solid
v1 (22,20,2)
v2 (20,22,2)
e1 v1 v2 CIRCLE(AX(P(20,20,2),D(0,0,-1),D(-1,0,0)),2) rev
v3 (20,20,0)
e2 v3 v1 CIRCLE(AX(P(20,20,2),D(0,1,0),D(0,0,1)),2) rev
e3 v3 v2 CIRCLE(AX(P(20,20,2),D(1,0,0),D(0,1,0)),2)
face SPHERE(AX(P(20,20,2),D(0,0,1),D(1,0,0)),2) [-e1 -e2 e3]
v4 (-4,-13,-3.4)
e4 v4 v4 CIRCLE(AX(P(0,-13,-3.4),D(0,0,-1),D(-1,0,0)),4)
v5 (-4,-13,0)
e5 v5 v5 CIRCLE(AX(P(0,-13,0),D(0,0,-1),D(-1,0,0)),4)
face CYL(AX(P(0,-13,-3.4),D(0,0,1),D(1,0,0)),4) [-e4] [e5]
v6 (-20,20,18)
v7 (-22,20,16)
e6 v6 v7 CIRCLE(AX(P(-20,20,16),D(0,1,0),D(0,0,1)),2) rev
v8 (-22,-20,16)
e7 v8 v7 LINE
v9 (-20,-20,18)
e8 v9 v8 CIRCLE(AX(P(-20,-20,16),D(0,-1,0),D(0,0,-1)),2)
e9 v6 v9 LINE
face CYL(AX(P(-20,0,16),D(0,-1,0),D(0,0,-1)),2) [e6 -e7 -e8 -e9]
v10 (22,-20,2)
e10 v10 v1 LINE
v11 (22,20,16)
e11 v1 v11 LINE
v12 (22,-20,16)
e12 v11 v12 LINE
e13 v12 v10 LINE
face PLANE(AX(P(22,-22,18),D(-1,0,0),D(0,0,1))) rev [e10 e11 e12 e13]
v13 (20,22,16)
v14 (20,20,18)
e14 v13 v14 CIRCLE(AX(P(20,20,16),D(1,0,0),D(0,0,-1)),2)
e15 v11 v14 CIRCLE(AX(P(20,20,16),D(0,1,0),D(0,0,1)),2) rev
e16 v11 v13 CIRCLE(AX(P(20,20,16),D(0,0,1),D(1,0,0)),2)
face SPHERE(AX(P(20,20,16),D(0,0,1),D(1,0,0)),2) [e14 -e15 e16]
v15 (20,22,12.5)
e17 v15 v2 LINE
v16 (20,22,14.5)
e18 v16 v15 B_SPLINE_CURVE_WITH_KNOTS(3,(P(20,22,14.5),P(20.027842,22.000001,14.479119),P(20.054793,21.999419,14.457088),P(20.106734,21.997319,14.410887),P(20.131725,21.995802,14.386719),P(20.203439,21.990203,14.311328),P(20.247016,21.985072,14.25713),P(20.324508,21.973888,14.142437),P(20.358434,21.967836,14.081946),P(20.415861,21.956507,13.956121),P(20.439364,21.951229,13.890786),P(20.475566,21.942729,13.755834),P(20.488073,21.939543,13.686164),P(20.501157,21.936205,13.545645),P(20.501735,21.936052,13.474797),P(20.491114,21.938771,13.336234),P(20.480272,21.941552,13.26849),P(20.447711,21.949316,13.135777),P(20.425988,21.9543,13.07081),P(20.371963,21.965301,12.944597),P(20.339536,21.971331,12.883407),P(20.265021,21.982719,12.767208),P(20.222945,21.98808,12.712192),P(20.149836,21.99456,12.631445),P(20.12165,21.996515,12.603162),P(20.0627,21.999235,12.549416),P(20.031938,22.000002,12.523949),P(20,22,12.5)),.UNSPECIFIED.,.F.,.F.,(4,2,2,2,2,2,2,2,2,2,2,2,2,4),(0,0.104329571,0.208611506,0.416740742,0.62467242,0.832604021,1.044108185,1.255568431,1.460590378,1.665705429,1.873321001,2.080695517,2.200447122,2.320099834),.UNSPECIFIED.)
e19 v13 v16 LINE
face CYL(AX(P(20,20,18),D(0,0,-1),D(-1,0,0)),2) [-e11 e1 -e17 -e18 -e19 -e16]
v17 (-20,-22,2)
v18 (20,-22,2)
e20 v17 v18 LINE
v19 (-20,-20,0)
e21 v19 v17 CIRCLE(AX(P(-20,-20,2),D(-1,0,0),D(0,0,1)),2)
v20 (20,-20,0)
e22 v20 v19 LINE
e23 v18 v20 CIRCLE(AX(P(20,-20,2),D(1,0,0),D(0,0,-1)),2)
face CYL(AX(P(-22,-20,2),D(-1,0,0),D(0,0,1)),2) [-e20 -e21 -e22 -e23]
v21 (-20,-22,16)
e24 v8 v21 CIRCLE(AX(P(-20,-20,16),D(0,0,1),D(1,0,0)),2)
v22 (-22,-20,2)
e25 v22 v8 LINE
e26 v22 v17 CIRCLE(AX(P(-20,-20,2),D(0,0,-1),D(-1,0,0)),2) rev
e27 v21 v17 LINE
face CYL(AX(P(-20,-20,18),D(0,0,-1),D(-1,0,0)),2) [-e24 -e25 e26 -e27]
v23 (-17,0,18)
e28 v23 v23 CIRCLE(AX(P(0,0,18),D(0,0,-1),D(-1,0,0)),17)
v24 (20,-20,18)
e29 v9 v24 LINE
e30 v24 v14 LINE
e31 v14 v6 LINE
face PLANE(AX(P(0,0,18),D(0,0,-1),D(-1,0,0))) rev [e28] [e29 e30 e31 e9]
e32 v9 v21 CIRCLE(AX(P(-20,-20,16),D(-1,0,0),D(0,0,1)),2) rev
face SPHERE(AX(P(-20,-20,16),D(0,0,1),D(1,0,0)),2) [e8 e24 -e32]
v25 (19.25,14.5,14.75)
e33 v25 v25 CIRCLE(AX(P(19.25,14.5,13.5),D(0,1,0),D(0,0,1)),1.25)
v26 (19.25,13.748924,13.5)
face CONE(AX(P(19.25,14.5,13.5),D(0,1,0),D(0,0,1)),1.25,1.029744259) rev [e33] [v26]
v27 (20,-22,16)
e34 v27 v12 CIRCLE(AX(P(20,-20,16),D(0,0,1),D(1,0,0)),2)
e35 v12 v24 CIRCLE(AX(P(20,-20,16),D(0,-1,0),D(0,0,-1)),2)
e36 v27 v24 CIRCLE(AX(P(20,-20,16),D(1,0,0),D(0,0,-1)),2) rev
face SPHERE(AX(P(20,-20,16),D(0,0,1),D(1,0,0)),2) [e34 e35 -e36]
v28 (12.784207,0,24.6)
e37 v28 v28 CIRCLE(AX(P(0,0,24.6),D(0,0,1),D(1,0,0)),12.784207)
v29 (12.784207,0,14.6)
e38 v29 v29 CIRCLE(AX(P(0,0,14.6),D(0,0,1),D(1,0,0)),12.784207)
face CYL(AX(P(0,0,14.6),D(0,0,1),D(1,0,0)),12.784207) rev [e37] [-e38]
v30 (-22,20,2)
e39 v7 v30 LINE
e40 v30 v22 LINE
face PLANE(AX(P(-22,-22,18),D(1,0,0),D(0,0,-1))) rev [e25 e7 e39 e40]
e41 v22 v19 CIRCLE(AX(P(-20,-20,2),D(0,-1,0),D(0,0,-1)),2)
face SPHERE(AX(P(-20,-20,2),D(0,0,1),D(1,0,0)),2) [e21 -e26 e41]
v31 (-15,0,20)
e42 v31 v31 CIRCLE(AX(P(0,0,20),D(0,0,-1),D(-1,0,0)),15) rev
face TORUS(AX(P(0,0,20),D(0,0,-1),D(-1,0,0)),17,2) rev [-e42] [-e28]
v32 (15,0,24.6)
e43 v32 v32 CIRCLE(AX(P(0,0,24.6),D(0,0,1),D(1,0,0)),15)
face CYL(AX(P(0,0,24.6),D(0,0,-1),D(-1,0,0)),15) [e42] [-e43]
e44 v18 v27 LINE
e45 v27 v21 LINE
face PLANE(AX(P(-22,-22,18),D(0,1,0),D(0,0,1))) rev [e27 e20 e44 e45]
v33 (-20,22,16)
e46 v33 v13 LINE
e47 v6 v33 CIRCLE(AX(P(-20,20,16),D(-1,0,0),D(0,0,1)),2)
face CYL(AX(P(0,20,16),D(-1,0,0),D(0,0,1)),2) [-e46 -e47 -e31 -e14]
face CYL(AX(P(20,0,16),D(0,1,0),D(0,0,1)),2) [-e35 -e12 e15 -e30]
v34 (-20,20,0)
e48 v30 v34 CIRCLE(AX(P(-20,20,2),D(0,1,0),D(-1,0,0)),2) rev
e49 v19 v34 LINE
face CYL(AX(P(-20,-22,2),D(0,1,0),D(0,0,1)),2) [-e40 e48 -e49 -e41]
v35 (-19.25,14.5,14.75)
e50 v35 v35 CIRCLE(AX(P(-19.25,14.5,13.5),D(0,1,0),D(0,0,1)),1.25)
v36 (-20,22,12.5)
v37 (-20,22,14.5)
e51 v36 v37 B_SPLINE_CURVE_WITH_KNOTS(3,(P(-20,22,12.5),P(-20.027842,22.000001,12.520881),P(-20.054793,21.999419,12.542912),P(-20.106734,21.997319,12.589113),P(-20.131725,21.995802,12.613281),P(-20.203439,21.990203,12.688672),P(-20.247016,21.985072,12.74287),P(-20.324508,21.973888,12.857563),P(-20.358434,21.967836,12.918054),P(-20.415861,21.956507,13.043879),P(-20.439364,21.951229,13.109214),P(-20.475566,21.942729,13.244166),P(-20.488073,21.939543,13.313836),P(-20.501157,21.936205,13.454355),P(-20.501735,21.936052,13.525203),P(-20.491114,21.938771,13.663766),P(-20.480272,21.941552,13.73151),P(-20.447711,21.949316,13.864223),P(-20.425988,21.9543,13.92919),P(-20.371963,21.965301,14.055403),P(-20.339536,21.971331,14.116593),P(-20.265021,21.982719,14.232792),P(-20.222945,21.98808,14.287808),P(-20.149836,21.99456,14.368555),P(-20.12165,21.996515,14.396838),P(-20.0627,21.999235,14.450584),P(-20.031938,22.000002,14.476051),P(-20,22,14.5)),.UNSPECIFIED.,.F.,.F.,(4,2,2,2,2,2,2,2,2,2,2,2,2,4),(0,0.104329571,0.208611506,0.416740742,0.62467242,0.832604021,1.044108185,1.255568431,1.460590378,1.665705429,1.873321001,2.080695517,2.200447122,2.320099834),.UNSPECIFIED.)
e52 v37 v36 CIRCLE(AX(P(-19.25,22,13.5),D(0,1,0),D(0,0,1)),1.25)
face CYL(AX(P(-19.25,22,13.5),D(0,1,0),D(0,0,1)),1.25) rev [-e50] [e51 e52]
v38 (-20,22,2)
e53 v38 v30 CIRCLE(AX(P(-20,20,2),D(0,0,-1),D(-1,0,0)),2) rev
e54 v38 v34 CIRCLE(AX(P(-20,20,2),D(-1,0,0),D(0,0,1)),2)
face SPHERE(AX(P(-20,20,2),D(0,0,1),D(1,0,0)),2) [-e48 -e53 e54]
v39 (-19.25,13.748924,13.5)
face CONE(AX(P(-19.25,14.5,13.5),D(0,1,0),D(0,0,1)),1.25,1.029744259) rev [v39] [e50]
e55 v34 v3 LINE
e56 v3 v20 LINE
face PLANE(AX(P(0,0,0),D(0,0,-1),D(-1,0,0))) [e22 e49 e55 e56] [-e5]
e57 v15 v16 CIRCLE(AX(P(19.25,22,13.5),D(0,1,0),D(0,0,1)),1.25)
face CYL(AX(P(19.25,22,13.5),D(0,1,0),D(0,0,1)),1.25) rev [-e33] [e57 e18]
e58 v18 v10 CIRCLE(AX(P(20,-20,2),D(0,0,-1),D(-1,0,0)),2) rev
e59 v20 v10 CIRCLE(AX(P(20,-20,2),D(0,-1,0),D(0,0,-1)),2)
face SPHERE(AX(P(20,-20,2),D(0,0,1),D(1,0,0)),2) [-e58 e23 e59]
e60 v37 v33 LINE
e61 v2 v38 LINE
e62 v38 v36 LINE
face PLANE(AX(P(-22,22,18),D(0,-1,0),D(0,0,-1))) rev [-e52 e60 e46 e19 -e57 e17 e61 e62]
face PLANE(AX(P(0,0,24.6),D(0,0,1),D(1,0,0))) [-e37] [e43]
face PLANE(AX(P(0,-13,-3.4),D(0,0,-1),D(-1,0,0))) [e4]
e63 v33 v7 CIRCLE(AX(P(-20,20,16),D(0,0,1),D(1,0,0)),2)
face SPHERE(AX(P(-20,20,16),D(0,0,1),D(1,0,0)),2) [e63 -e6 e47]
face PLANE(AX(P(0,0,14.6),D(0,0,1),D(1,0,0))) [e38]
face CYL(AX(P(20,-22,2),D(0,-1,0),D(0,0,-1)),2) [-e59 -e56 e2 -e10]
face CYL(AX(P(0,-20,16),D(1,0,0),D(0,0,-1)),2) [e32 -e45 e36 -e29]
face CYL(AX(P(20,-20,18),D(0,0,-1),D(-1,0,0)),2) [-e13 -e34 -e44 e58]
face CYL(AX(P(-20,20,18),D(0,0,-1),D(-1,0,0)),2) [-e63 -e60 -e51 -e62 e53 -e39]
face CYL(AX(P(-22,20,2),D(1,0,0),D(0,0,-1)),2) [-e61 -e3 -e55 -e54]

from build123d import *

# Parameters (mm, degrees)
SKETCH1_W             = 44
SKETCH1_H             = 44
BOSS_EXTRUDE1_DEPTH   = 18
SKETCH2_R             = 15
BOSS_EXTRUDE2_DEPTH   = 6.6
M3_TAPPED_HOLE1_D     = 2.5
M3_TAPPED_HOLE1_DEPTH = 7.5
M3_TAPPED_HOLE1_TIP   = 0.751075774
SKETCH5_R             = 4
BOSS_EXTRUDE3_DEPTH   = 3.4
FILLET2_R             = 2
SKETCH6_R             = 12.784207237
CUT_EXTRUDE1_DEPTH    = 10


with BuildPart() as part:
    # Sketch1 → Boss-Extrude1 (new body)
    with BuildSketch(Plane.XY):
        Rectangle(SKETCH1_W, SKETCH1_H)
    extrude(amount=BOSS_EXTRUDE1_DEPTH)

    # Sketch2 → Boss-Extrude2 (add)
    with BuildSketch(Plane.XY.offset(18)):
        Circle(SKETCH2_R)
    extrude(amount=BOSS_EXTRUDE2_DEPTH)

    # M3 Tapped Hole1
    with Locations(Plane(origin=(0, 22, 0), x_dir=(1, 0, 0), z_dir=(0, 1, 0))):
        with Locations((-19.25, -13.5), (19.25, -13.5)):
            Hole(M3_TAPPED_HOLE1_D / 2, depth=M3_TAPPED_HOLE1_DEPTH)
            with Locations((0, 0, -(M3_TAPPED_HOLE1_DEPTH + M3_TAPPED_HOLE1_TIP / 2))):  # 118° drill point
                Cone(0, M3_TAPPED_HOLE1_D / 2, M3_TAPPED_HOLE1_TIP, mode=Mode.SUBTRACT)

    # Sketch5 → Boss-Extrude3 (add)
    with BuildSketch(Plane(origin=(0, 0, 0), x_dir=(-1, 0, 0), z_dir=(0, 0, -1))):
        with Locations((0, -13)):
            Circle(SKETCH5_R)
    extrude(amount=BOSS_EXTRUDE3_DEPTH)

    # Fillet2
    # the kernel refuses this fillet: 2 mm, written as the material it adds along each edge
    with BuildSketch(Plane(origin=(0, 0, 18), x_dir=(1, 0, 0), z_dir=(0, -1, 0))) as fillet2_piece_1:
        with BuildLine():
            CenterArc((15 + FILLET2_R, FILLET2_R), FILLET2_R, 180, 90)
            Line((15, FILLET2_R), (15, 0))
            Line((15, 0), (15 + FILLET2_R, 0))
        make_face()
    revolve(axis=Axis((0, 0, 18), (0, 0, 1)))
    # the kernel refuses this fillet: 2 mm, written as the material it takes off along each edge
    with BuildSketch(Plane(origin=(-20, 20, 16), x_dir=(0, 0, 1), z_dir=(-1, 0, 0))) as fillet2_2_piece_1_section:
        Polygon((0, 0), (FILLET2_R, 0), (FILLET2_R, FILLET2_R), (0, FILLET2_R), align=None)
    fillet2_2_piece_1 = extrude(amount=FILLET2_R, mode=Mode.PRIVATE)
    fillet2_2_piece_1 = fillet2_2_piece_1 - Plane(origin=(-20, 20, 16), x_dir=(0, -0.7071067811865475, -0.7071067811865475), z_dir=(-1, 0, 0)) * Sphere(FILLET2_R, mode=Mode.PRIVATE)
    add(fillet2_2_piece_1, mode=Mode.SUBTRACT)
    with BuildSketch(Plane(origin=(-20, -20, 16), x_dir=(-1, 0, 0), z_dir=(0, -1, 0))) as fillet2_2_piece_2_section:
        Polygon((0, 0), (FILLET2_R, 0), (FILLET2_R, -FILLET2_R), (0, -FILLET2_R), align=None)
    fillet2_2_piece_2 = extrude(amount=FILLET2_R, mode=Mode.PRIVATE)
    fillet2_2_piece_2 = fillet2_2_piece_2 - Plane(origin=(-20, -20, 16), x_dir=(0.7071067811865475, 0, -0.7071067811865475), z_dir=(0, -1, 0)) * Sphere(FILLET2_R, mode=Mode.PRIVATE)
    add(fillet2_2_piece_2, mode=Mode.SUBTRACT)
    with BuildSketch(Plane(origin=(20, -20, 16), x_dir=(1, 0, 0), z_dir=(0, -1, 0))) as fillet2_2_piece_3_section:
        Polygon((0, 0), (FILLET2_R, 0), (FILLET2_R, FILLET2_R), (0, FILLET2_R), align=None)
    fillet2_2_piece_3 = extrude(amount=FILLET2_R, mode=Mode.PRIVATE)
    fillet2_2_piece_3 = fillet2_2_piece_3 - Plane(origin=(20, -20, 16), x_dir=(-0.7071067811865475, 0, -0.7071067811865475), z_dir=(0, -1, 0)) * Sphere(FILLET2_R, mode=Mode.PRIVATE)
    add(fillet2_2_piece_3, mode=Mode.SUBTRACT)
    with BuildSketch(Plane(origin=(20, 20, 16), x_dir=(0, 0, 1), z_dir=(1, 0, 0))) as fillet2_2_piece_4_section:
        Polygon((0, 0), (FILLET2_R, 0), (FILLET2_R, -FILLET2_R), (0, -FILLET2_R), align=None)
    fillet2_2_piece_4 = extrude(amount=FILLET2_R, mode=Mode.PRIVATE)
    fillet2_2_piece_4 = fillet2_2_piece_4 - Plane(origin=(20, 20, 16), x_dir=(0, -0.7071067811865475, -0.7071067811865475), z_dir=(1, 0, 0)) * Sphere(FILLET2_R, mode=Mode.PRIVATE)
    add(fillet2_2_piece_4, mode=Mode.SUBTRACT)
    with BuildSketch(Plane(origin=(-20, -20, 2), x_dir=(-1, 0, 0), z_dir=(0, -1, 0))) as fillet2_2_piece_5_section:
        Polygon((0, 0), (FILLET2_R, 0), (FILLET2_R, FILLET2_R), (0, FILLET2_R), align=None)
    fillet2_2_piece_5 = extrude(amount=FILLET2_R, mode=Mode.PRIVATE)
    fillet2_2_piece_5 = fillet2_2_piece_5 - Plane(origin=(-20, -20, 2), x_dir=(0.7071067811865475, 0, 0.7071067811865475), z_dir=(0, -1, 0)) * Sphere(FILLET2_R, mode=Mode.PRIVATE)
    add(fillet2_2_piece_5, mode=Mode.SUBTRACT)
    with BuildSketch(Plane(origin=(20, -20, 2), x_dir=(1, 0, 0), z_dir=(0, -1, 0))) as fillet2_2_piece_6_section:
        Polygon((0, 0), (FILLET2_R, 0), (FILLET2_R, -FILLET2_R), (0, -FILLET2_R), align=None)
    fillet2_2_piece_6 = extrude(amount=FILLET2_R, mode=Mode.PRIVATE)
    fillet2_2_piece_6 = fillet2_2_piece_6 - Plane(origin=(20, -20, 2), x_dir=(-0.7071067811865475, 0, 0.7071067811865475), z_dir=(0, -1, 0)) * Sphere(FILLET2_R, mode=Mode.PRIVATE)
    add(fillet2_2_piece_6, mode=Mode.SUBTRACT)
    with BuildSketch(Plane(origin=(-20, 20, 2), x_dir=(0, 0, -1), z_dir=(-1, 0, 0))) as fillet2_2_piece_7_section:
        Polygon((0, 0), (FILLET2_R, 0), (FILLET2_R, -FILLET2_R), (0, -FILLET2_R), align=None)
    fillet2_2_piece_7 = extrude(amount=FILLET2_R, mode=Mode.PRIVATE)
    fillet2_2_piece_7 = fillet2_2_piece_7 - Plane(origin=(-20, 20, 2), x_dir=(0, -0.7071067811865475, 0.7071067811865475), z_dir=(-1, 0, 0)) * Sphere(FILLET2_R, mode=Mode.PRIVATE)
    add(fillet2_2_piece_7, mode=Mode.SUBTRACT)
    with BuildSketch(Plane(origin=(20, 20, 2), x_dir=(0, 0, -1), z_dir=(1, 0, 0))) as fillet2_2_piece_8_section:
        Polygon((0, 0), (FILLET2_R, 0), (FILLET2_R, FILLET2_R), (0, FILLET2_R), align=None)
    fillet2_2_piece_8 = extrude(amount=FILLET2_R, mode=Mode.PRIVATE)
    fillet2_2_piece_8 = fillet2_2_piece_8 - Plane(origin=(20, 20, 2), x_dir=(0, -0.7071067811865475, 0.7071067811865475), z_dir=(1, 0, 0)) * Sphere(FILLET2_R, mode=Mode.PRIVATE)
    add(fillet2_2_piece_8, mode=Mode.SUBTRACT)
    with BuildSketch(Plane(origin=(-22, 20, 18), x_dir=(0, 0, -1), z_dir=(0, -1, 0)), Plane(origin=(-20, -22, 18), x_dir=(0, 0, -1), z_dir=(1, 0, 0)), Plane(origin=(22, -20, 18), x_dir=(0, 0, -1), z_dir=(0, 1, 0)), Plane(origin=(20, 22, 0), x_dir=(0, -1, 0), z_dir=(-1, 0, 0))) as fillet2_2_piece_9:
        with BuildLine():
            CenterArc((FILLET2_R, FILLET2_R), FILLET2_R, 180, 90)
            Line((0, FILLET2_R), (0, 0))
            Line((0, 0), (FILLET2_R, 0))
        make_face()
    extrude(amount=40, mode=Mode.SUBTRACT)
    with BuildSketch(Plane(origin=(-20, -22, 0), x_dir=(0, 0, 1), z_dir=(1, 0, 0)), Plane(origin=(-22, 20, 0), x_dir=(0, 0, 1), z_dir=(0, -1, 0)), Plane(origin=(22, -20, 0), x_dir=(0, 0, 1), z_dir=(0, 1, 0)), Plane(origin=(20, 22, 18), x_dir=(0, -1, 0), z_dir=(-1, 0, 0))) as fillet2_2_piece_10:
        with BuildLine():
            CenterArc((FILLET2_R, -FILLET2_R), FILLET2_R, 90, 90)
            Line((0, -FILLET2_R), (0, 0))
            Line((0, 0), (FILLET2_R, 0))
        make_face()
    extrude(amount=40, mode=Mode.SUBTRACT)
    with BuildSketch(Plane(origin=(22, -22, 2), x_dir=(-1, 0, 0), z_dir=(0, 0, 1)), Plane(origin=(22, 22, 2), x_dir=(0, -1, 0), z_dir=(0, 0, 1))) as fillet2_2_piece_11:
        with BuildLine():
            CenterArc((FILLET2_R, -FILLET2_R), FILLET2_R, 90, 90)
            Line((0, -FILLET2_R), (0, 0))
            Line((0, 0), (FILLET2_R, 0))
        make_face()
    extrude(amount=14, mode=Mode.SUBTRACT)
    with BuildSketch(Plane(origin=(-22, -22, 2), x_dir=(1, 0, 0), z_dir=(0, 0, 1)), Plane(origin=(-22, 22, 2), x_dir=(0, -1, 0), z_dir=(0, 0, 1))) as fillet2_2_piece_12:
        with BuildLine():
            CenterArc((FILLET2_R, FILLET2_R), FILLET2_R, 180, 90)
            Line((0, FILLET2_R), (0, 0))
            Line((0, 0), (FILLET2_R, 0))
        make_face()
    extrude(amount=14, mode=Mode.SUBTRACT)

    # Sketch6 → Cut-Extrude1 (cut)
    with BuildSketch(Plane.XY.offset(24.6)):
        Circle(SKETCH6_R)
    extrude(amount=-CUT_EXTRUDE1_DEPTH, mode=Mode.SUBTRACT)


solid = part.part
